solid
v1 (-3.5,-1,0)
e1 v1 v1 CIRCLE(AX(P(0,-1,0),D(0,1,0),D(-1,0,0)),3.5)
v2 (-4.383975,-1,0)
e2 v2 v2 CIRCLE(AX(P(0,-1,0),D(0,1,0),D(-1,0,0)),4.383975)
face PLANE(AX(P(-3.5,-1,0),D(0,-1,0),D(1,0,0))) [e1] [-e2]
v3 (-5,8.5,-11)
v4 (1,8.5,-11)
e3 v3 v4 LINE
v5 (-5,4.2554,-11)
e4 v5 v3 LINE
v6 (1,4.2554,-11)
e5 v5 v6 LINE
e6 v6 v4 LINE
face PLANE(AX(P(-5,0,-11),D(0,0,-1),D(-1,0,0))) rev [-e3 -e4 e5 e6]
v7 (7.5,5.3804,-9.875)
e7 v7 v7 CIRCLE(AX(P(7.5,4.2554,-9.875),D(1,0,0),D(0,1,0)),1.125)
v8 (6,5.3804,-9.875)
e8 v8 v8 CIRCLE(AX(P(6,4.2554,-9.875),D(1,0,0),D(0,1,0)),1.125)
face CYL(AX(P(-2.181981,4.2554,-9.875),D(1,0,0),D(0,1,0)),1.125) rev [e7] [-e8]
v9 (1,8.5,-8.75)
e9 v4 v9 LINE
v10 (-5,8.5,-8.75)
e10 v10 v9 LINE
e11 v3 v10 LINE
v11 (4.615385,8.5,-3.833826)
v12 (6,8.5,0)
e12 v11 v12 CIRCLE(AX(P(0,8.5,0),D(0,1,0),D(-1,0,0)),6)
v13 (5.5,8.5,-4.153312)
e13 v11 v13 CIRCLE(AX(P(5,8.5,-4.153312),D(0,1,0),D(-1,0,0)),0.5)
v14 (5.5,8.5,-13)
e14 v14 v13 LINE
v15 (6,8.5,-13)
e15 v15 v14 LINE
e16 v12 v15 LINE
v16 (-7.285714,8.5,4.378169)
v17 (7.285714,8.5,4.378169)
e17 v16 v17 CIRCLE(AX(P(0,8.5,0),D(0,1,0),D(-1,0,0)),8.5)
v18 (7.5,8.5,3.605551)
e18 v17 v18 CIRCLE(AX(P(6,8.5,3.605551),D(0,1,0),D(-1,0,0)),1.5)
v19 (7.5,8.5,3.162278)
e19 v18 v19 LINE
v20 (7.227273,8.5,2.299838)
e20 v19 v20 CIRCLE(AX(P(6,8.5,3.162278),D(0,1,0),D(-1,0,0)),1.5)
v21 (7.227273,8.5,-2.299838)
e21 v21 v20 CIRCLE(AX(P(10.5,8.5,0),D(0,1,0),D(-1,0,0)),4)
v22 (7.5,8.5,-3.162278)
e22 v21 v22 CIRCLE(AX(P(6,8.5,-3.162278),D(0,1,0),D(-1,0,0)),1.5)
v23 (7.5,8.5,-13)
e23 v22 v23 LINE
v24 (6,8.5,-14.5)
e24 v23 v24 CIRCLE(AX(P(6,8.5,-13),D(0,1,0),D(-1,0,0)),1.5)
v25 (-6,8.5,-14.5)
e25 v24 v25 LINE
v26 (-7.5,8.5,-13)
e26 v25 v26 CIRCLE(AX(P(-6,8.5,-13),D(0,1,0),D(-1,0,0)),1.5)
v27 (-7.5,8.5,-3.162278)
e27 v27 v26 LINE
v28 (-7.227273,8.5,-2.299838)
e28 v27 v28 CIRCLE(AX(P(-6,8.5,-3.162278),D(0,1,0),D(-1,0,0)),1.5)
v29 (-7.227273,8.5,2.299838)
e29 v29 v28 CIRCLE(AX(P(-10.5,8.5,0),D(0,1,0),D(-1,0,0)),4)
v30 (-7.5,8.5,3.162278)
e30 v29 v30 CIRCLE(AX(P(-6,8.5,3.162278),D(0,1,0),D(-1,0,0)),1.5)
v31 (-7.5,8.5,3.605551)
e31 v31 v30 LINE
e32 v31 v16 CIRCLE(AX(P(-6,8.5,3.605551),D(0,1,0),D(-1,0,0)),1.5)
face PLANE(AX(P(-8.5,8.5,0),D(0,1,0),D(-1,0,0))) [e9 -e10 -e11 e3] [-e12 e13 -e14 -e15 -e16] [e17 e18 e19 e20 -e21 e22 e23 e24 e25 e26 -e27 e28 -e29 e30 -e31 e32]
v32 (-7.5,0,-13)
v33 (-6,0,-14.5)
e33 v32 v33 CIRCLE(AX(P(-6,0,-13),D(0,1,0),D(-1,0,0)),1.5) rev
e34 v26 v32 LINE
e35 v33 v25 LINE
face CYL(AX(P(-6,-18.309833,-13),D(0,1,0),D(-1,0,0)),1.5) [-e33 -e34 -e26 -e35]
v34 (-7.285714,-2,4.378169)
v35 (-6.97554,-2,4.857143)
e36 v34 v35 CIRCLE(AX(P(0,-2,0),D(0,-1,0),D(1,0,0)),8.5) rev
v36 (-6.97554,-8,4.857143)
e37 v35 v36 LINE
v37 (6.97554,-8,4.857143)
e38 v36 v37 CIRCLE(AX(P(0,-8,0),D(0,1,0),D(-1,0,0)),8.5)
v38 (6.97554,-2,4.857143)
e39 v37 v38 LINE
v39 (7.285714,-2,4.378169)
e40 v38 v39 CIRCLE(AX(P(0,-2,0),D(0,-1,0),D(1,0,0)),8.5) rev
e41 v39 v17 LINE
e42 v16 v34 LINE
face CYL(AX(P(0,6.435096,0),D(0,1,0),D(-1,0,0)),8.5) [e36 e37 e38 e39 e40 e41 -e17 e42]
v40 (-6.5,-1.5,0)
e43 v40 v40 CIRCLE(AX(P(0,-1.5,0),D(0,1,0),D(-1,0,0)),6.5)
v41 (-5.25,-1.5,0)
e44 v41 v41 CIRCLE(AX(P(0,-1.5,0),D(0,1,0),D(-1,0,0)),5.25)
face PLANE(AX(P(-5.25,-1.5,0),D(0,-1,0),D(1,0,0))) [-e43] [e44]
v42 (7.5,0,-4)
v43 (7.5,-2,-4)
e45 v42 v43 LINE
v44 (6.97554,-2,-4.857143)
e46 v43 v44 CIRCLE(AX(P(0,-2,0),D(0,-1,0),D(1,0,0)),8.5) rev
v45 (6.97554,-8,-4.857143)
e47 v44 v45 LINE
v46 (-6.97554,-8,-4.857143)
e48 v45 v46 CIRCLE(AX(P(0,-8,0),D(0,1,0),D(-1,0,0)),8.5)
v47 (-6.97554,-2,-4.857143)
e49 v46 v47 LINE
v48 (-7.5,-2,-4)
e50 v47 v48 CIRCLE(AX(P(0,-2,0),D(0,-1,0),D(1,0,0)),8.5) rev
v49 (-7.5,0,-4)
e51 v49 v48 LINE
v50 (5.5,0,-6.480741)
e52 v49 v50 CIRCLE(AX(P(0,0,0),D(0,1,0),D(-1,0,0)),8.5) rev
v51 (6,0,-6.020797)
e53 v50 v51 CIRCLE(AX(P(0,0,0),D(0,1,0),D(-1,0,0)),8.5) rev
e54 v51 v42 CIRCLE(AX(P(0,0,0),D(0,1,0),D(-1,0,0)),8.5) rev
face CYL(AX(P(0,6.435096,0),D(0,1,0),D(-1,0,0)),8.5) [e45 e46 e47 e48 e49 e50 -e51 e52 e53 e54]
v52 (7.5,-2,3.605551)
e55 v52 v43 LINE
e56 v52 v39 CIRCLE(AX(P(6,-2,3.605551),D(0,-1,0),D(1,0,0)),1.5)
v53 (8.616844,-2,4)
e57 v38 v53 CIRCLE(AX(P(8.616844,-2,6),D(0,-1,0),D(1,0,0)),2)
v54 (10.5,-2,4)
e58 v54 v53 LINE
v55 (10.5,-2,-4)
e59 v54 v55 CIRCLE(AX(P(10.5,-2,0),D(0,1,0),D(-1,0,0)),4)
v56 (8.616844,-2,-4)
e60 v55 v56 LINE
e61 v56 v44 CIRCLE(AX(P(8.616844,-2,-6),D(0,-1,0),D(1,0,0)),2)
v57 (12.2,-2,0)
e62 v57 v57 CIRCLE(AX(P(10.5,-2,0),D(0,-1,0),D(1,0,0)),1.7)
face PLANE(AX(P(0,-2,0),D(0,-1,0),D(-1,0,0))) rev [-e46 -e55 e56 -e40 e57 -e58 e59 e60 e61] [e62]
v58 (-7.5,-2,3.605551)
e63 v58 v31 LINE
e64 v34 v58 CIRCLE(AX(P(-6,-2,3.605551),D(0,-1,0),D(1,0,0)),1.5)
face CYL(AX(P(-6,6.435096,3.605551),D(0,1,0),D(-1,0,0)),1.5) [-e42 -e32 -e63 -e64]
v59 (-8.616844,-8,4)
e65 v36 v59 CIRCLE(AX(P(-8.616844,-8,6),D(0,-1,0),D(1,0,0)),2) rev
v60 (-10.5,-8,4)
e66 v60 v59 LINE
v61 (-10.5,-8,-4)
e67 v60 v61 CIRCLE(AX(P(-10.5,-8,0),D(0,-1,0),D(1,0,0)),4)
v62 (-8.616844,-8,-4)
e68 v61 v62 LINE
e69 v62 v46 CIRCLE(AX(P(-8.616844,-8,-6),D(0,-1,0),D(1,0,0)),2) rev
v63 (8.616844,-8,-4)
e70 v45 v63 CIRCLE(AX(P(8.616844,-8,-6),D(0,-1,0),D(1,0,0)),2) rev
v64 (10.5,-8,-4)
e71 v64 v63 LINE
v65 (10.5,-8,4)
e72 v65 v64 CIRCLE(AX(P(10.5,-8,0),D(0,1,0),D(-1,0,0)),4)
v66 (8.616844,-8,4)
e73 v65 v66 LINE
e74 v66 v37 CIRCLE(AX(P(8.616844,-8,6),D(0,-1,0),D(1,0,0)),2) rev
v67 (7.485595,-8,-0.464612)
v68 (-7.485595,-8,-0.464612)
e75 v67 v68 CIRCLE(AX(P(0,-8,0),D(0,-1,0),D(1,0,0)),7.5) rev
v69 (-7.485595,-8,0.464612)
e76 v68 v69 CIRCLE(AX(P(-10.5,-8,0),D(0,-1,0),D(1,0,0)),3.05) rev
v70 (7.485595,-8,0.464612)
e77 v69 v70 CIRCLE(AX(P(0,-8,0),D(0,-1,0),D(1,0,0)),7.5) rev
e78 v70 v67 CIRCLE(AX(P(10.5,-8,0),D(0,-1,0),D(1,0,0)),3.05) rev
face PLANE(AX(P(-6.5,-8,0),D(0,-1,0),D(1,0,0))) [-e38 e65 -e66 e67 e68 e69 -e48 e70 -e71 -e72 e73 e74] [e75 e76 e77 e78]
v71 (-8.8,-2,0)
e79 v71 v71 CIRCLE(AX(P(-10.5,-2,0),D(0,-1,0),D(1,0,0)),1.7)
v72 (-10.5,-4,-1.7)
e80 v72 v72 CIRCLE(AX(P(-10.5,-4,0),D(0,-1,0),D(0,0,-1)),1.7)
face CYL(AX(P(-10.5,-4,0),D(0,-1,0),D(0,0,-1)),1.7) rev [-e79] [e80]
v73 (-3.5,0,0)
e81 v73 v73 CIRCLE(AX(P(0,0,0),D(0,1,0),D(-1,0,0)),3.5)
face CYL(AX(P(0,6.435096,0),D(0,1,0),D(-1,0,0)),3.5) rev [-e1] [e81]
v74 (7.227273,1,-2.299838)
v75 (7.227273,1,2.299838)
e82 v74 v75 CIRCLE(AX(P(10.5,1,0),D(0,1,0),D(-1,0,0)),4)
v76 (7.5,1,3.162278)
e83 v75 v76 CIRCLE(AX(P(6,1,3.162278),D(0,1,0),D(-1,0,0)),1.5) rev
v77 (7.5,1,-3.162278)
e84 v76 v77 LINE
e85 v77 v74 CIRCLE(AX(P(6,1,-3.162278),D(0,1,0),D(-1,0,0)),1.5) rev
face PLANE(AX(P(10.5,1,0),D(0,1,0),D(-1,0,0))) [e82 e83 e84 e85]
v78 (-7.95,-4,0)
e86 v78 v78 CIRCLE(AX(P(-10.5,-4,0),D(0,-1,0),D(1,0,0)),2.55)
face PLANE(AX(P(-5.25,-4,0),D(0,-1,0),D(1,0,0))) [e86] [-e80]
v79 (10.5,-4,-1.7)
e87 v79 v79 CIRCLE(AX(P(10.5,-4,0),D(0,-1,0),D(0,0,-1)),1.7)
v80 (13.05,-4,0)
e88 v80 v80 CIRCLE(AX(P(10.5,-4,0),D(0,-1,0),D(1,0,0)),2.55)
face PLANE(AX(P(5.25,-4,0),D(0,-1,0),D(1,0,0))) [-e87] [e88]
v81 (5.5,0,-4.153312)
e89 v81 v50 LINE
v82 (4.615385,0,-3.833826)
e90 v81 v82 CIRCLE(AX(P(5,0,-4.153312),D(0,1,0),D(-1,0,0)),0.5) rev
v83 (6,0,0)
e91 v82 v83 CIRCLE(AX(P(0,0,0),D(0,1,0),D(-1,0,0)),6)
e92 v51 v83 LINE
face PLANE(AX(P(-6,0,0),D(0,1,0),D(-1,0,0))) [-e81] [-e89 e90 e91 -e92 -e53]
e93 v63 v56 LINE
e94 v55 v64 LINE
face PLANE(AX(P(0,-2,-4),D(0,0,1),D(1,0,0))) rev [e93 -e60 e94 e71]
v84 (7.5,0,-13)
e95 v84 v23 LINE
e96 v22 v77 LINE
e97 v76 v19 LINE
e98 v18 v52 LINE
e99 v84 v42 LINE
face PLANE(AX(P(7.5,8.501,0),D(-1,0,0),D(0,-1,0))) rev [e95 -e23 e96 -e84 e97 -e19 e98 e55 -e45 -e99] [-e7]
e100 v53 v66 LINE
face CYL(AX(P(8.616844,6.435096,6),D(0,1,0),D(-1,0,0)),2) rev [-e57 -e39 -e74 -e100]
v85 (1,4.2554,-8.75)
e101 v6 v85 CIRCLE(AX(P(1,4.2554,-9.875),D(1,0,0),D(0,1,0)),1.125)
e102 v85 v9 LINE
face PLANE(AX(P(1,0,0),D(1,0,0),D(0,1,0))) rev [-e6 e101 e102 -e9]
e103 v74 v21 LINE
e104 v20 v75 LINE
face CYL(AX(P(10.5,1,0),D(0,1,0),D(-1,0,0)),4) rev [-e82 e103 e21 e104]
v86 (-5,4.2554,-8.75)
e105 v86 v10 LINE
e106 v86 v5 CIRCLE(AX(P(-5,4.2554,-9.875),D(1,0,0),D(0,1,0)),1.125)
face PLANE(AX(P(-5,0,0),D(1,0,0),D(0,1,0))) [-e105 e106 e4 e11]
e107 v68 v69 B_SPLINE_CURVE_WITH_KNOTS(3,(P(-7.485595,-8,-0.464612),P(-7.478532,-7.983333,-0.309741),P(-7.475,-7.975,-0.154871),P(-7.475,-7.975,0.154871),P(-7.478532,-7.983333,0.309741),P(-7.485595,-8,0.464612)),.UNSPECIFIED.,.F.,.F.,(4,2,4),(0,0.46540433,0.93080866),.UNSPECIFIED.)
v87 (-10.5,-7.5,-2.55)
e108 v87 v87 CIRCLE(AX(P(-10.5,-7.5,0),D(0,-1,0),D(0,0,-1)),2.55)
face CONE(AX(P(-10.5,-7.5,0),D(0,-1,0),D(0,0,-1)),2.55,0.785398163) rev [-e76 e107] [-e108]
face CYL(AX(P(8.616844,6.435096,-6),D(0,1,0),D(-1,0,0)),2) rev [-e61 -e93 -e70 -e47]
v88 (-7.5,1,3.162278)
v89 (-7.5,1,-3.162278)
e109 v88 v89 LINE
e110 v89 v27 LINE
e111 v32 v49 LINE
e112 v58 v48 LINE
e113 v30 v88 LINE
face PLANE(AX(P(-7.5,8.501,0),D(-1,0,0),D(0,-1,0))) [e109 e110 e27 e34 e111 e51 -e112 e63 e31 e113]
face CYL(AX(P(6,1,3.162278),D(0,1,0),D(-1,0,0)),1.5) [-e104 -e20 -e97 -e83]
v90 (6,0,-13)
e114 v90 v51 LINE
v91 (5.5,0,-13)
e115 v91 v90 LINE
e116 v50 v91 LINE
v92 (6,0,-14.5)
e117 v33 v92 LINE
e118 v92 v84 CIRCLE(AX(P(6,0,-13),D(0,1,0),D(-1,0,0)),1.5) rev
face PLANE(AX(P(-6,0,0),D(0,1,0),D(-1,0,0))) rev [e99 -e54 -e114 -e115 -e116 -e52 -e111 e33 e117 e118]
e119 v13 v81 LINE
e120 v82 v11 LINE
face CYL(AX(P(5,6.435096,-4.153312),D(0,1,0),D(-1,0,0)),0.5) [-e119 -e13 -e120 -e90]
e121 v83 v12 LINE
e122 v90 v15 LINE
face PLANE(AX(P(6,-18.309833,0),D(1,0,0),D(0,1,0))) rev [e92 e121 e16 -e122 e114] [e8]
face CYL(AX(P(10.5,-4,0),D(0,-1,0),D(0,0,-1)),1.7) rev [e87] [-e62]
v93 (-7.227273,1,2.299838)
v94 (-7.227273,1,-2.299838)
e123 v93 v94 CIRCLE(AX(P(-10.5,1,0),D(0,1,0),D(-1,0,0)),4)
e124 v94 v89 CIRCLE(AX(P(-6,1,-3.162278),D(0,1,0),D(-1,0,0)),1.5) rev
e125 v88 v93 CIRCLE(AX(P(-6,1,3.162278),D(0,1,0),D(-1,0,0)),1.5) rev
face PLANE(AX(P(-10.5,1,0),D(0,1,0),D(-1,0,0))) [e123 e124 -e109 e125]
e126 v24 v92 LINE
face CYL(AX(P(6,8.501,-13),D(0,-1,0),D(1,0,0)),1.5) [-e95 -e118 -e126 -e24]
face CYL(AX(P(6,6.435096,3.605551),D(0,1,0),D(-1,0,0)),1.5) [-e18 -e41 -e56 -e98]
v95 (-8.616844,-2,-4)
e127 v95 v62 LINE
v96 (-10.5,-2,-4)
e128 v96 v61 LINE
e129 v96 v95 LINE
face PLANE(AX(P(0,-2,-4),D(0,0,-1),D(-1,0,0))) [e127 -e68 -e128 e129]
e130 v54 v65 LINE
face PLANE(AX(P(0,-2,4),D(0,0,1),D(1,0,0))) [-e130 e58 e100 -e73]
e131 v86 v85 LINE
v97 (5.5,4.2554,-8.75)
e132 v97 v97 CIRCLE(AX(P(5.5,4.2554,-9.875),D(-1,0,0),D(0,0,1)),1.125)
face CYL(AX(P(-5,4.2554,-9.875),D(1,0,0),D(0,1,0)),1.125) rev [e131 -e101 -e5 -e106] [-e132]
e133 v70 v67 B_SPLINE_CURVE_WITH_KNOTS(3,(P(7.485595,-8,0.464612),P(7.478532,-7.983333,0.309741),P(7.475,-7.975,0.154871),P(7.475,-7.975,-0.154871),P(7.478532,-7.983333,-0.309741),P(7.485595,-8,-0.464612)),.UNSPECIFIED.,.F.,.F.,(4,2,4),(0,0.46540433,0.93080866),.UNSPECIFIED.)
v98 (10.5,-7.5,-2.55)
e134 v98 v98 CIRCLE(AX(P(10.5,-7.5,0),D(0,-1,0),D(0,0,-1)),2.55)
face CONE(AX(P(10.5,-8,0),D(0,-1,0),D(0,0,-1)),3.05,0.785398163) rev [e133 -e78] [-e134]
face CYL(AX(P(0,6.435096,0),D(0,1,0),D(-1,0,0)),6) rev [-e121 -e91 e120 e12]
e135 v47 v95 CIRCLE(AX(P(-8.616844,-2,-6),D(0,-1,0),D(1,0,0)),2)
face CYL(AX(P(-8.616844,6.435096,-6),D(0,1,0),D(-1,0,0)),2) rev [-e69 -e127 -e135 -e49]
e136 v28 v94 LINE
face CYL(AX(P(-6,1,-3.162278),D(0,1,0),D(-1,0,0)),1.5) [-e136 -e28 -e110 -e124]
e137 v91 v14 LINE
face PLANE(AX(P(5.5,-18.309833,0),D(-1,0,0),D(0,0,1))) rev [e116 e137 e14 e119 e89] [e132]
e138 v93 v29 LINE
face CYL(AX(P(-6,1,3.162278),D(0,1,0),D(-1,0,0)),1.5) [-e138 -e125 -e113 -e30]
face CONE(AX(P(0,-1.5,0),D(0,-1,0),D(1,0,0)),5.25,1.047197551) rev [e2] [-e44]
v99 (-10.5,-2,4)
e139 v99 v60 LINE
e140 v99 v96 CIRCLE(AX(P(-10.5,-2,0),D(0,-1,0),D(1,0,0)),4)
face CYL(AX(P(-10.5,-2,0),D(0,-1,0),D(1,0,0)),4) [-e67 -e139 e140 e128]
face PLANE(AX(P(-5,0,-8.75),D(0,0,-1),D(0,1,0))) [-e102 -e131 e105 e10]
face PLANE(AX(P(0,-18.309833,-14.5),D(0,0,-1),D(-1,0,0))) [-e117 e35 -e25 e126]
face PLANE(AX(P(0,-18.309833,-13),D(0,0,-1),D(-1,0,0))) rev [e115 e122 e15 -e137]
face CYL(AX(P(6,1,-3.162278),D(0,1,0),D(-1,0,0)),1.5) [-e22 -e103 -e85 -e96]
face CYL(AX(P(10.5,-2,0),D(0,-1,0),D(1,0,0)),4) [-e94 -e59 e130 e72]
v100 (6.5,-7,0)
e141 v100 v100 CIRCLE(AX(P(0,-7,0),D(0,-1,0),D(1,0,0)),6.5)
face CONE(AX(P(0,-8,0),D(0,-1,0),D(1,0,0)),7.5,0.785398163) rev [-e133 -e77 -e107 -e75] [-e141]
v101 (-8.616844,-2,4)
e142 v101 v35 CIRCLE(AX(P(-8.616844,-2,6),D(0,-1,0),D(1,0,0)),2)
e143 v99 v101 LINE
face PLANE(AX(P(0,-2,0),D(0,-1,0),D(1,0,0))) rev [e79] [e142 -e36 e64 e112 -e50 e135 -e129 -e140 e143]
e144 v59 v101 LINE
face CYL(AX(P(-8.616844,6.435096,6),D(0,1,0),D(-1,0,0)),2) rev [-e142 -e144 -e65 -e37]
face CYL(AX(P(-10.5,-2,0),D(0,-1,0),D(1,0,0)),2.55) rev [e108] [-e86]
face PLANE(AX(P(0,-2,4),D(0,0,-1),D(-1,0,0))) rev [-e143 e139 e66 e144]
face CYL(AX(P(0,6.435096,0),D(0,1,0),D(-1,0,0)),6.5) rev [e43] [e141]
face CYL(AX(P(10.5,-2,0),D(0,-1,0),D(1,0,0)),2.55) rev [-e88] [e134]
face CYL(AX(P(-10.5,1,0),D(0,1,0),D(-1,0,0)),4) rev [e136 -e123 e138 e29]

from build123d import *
from build123d.topology import SkipClean

# Parameters (mm, degrees)
BOSS_EXTRU_1_START      = -6
BOSS_EXTRU_1_DEPTH      = 6
BOSS_EXTRU_2_START      = -6
BOSS_EXTRU_2_DEPTH      = 2
ENL_V_START             = -4
ENL_V_MAT_EXTRU_1_DEPTH = 4
ENL_V_START_2           = -16.5
ENL_V_MAT_EXTRU_5_DEPTH = 10.5
CONG_1_R                = 2
CHANFREIN1_SIZE         = 0.5
SYM_TRIE1_START         = -2
SYM_TRIE1_DEPTH         = 10.5
SYM_TRIE1_START_2       = -8
SYM_TRIE1_2_DEPTH       = 4
SYM_TRIE1_START_3       = -7.5000001
SYM_TRIE1_3_DEPTH       = 5.5000001
SYM_TRIE1_START_4       = -4
SYM_TRIE1_4_DEPTH       = 2
SYM_TRIE1_7_DEPTH       = 0.4999999
M3_CLEARANCE_HOLE1_D    = 3.4
BOSS_EXTRU_3_DEPTH      = 8.5
ENL_V_START_3           = -8.5
ENL_V_MAT_EXTRU_2_DEPTH = 8.5
ENL_V_START_4           = -6.5
ESQUISSE5_R             = 1.125
ENL_V_MAT_EXTRU_3_DEPTH = 6
ESQUISSE5_3_R           = 1.125
ENL_V_MAT_EXTRU_4_DEPTH = 6.5
CONG_2_R                = 0.5
CONG_3_R                = 1.5
ENL_V_START_5           = -7.5
ESQUISSE9_R             = 4
ENL_V_MAT_EXTRU_8_DEPTH = 7.5
CONG_5_R                = 1.5
CHANFREIN2_SIZE         = 1


with BuildPart() as part:
    # Esquisse1 → Révolution1 (revolve)
    with BuildSketch(Plane.XY):
        Polygon((-8.5, 8.5), (-6, 8.5), (-6, 0), (-3.5, 0), (-3.5, -1), (-4.383974596, -1), (-5.25, -1.5), (-6.5, -1.5), (-6.5, -8), (-8.5, -8), align=None)
    revolve(axis=Axis((0, 6.43509573, 0), (0, -1, 0)))

    # Esquisse3 → Boss.-Extru.1 (add)
    with BuildSketch(Plane.XZ.offset(8).offset(BOSS_EXTRU_1_START)):
        with BuildLine():
            ThreePointArc((-7.928571429, 3.06394437), (-7.728470361, 3.5384666), (-7.5, 4))
            Line((-7.5, 4), (-10.5, 4))
            ThreePointArc((-10.5, 4), (-14.5, 0), (-10.5, -4))
            Line((-10.5, -4), (-7.5, -4))
            ThreePointArc((-7.5, -4), (-7.728470361, -3.5384666), (-7.928571429, -3.06394437))
            ThreePointArc((-7.928571429, -3.06394437), (-8.196108254, -2.252511816), (-8.380833333, -1.418320358))
            ThreePointArc((-8.380833333, -1.418320358), (-13.05, 0), (-8.380833333, 1.418320358))
            ThreePointArc((-8.380833333, 1.418320358), (-8.196108254, 2.252511816), (-7.928571429, 3.06394437))
        make_face()
    extrude(amount=BOSS_EXTRU_1_DEPTH)

    # Esquisse3<4> → Boss.-Extru.2 (add)
    with BuildSketch(Plane.XZ.offset(8).offset(BOSS_EXTRU_2_START)):
        with BuildLine():
            ThreePointArc((-8.380833333, -1.418320358), (-8.5, 0), (-8.380833333, 1.418320358))
            ThreePointArc((-8.380833333, 1.418320358), (-13.05, 0), (-8.380833333, -1.418320358))
        make_face()
    extrude(amount=BOSS_EXTRU_2_DEPTH)

    # Esquisse3<5> → Enlèv. mat.-Extru.1 (cut)
    with SkipClean():  # the faces are left unmerged after this step: merging them gives an invalid solid
        with BuildSketch(Plane.XZ.offset(8).offset(ENL_V_START)):
            with BuildLine():
                ThreePointArc((-7.95, 0), (-8.06008453, 0.741156191), (-8.380833333, 1.418320358))
                ThreePointArc((-8.380833333, 1.418320358), (-8.5, 0), (-8.380833333, -1.418320358))
                ThreePointArc((-8.380833333, -1.418320358), (-8.06008453, -0.741156191), (-7.95, 0))
            make_face()
        extrude(amount=ENL_V_MAT_EXTRU_1_DEPTH, mode=Mode.SUBTRACT)

    # Esquisse3<7> → Enlèv. mat.-Extru.5 (cut)
    with SkipClean():  # the faces are left unmerged after this step: merging them gives an invalid solid
        with BuildSketch(Plane.XZ.offset(8).offset(ENL_V_START_2)):
            with BuildLine():
                ThreePointArc((-7.5, 4), (-8.5, 0), (-7.5, -4))
                Line((-7.5, -4), (-7.5, 4))
            make_face()
        extrude(amount=ENL_V_MAT_EXTRU_5_DEPTH, mode=Mode.SUBTRACT)

    # Congé1
    # the kernel refuses this fillet: 2 mm, written as the material it adds along each edge
    with BuildSketch(Plane(origin=(-7.5, -2, 4), x_dir=(0.5219209843200922, 0, 0.8529938370975175), z_dir=(0, -1, 0))) as cong_1_piece_1:
        with BuildLine():
            CenterArc((1.12308337, 1.996502992), CONG_1_R, 211.461195757, 55.150095421)
            Line((-0.582904304, 0.952661023), (0, 0))
            ThreePointArc((0, 0), (0.502432034, 0.014862284), (1.004864068, 0))
        make_face()
    extrude(amount=6)
    with BuildSketch(Plane(origin=(-7.5, -2, -4), x_dir=(0.521920984320094, 0, -0.8529938370975163), z_dir=(0, -1, 0))) as cong_1_piece_2:
        with BuildLine():
            CenterArc((1.12308337, -1.996502992), CONG_1_R, 93.388708822, 55.150095421)
            Line((-0.582904304, -0.952661023), (0, 0))
            ThreePointArc((0, 0), (0.502432034, -0.014862284), (1.004864068, 0))
        make_face()
    extrude(amount=6)

    # Chanfrein1
    chanfrein1_edges = [part.edges().sort_by_distance(p)[0] for p in [
        (-7.95, -8, 0),
    ]]
    chamfer(chanfrein1_edges, length=CHANFREIN1_SIZE)

    # Symétrie1: read off the stored shape, not the designer's step
    # Symétrie1 outline → Symétrie1 (cut)
    with BuildSketch(Plane(origin=(0, 0, 0), x_dir=(1, 0, 0), z_dir=(0, 1, 0)).offset(SYM_TRIE1_START)):
        with BuildLine():
            Line((7.5, 4), (7.5, -4))
            ThreePointArc((7.5, -4), (8.5, 0), (7.5, 4))
        make_face()
    extrude(amount=SYM_TRIE1_DEPTH, mode=Mode.SUBTRACT)

    # Sym_trie1 2 outline → Sym_trie1 2 (cut)
    with BuildSketch(Plane(origin=(0, 0, 0), x_dir=(1, 0, 0), z_dir=(0, 1, 0)).offset(SYM_TRIE1_START_2)):
        with BuildLine():
            ThreePointArc((8.380833333, 1.418320358), (7.95, 0), (8.380833333, -1.418320358))
            ThreePointArc((8.380833333, -1.418320358), (8.5, 0), (8.380833333, 1.418320358))
        make_face()
    extrude(amount=SYM_TRIE1_2_DEPTH, mode=Mode.SUBTRACT)

    # Sym_trie1 3 outline → Sym_trie1 3 (add)
    with BuildSketch(Plane(origin=(0, 0, 0), x_dir=(1, 0, 0), z_dir=(0, 1, 0)).offset(SYM_TRIE1_START_3)):
        with BuildLine():
            ThreePointArc((6.975540357, -4.857142857), (7.69102387, -4.227189479), (8.61684397, -4))
            Line((8.61684397, -4), (10.5, -4))
            ThreePointArc((10.5, -4), (14.5, 0), (10.5, 4))
            Line((10.5, 4), (8.61684397, 4))
            ThreePointArc((8.61684397, 4), (7.69102387, 4.227189479), (6.975540357, 4.857142857))
            ThreePointArc((6.975540357, 4.857142857), (7.868349781, 3.215442696), (8.380833333, 1.418320358))
            ThreePointArc((8.380833333, 1.418320358), (13.05, 0), (8.380833333, -1.418320358))
            ThreePointArc((8.380833333, -1.418320358), (7.868349781, -3.215442696), (6.975540357, -4.857142857))
        make_face()
    extrude(amount=SYM_TRIE1_3_DEPTH)

    # Sym_trie1 4 outline → Sym_trie1 4 (add)
    with BuildSketch(Plane(origin=(0, 0, 0), x_dir=(1, 0, 0), z_dir=(0, 1, 0)).offset(SYM_TRIE1_START_4)):
        with BuildLine():
            ThreePointArc((8.380833333, 1.418320358), (8.5, 0), (8.380833333, -1.418320358))
            ThreePointArc((8.380833333, -1.418320358), (13.05, 0), (8.380833333, 1.418320358))
        make_face()
    extrude(amount=SYM_TRIE1_4_DEPTH)

    # Sym_trie1 5 outline → Sym_trie1 5 (revolve, cut)
    with BuildSketch(Plane(origin=(10.5, 0, 0), x_dir=(1, 0, 0), z_dir=(0, 0, 1))):
        Polygon((3.05, -8), (2.55, -7.5), (2.55, -8), align=None)
    revolve(axis=Axis((10.5, 0, 0), (0, 1, 0)), mode=Mode.SUBTRACT)

    # Sym_trie1 6 outline → Sym_trie1 6 (revolve)
    with SkipClean():  # the faces are left unmerged after this step: merging them gives an invalid solid
        with BuildSketch(Plane(origin=(10.5, 0, 0), x_dir=(1, 0, 0), z_dir=(0, 0, 1))):
            Polygon((3.05, -7.5), (2.55, -7.5), (3.05, -8), align=None)
        revolve(axis=Axis((10.5, 0, 0), (0, 1, 0)))

    # Sym_trie1 7 outline → Sym_trie1 7 (add)
    with BuildSketch(Plane(origin=(0, 0, 0), x_dir=(1, 0, 0), z_dir=(0, 1, 0)).offset(SYM_TRIE1_START_2)):
        with BuildLine():
            ThreePointArc((8.2475, 2.056390953), (13.55, 0), (8.2475, -2.056390953))
            ThreePointArc((8.2475, -2.056390953), (7.933495012, -3.051173035), (7.5, -4))
            ThreePointArc((7.5, -4), (7.250447615, -4.436328367), (6.975540357, -4.857142857))
            ThreePointArc((6.975540357, -4.857142857), (7.69102387, -4.227189479), (8.61684397, -4))
            Line((8.61684397, -4), (10.5, -4))
            ThreePointArc((10.5, -4), (14.5, 0), (10.5, 4))
            Line((10.5, 4), (8.61684397, 4))
            ThreePointArc((8.61684397, 4), (7.69102387, 4.227189479), (6.975540357, 4.857142857))
            ThreePointArc((6.975540357, 4.857142857), (7.250447615, 4.436328367), (7.5, 4))
            ThreePointArc((7.5, 4), (7.933495012, 3.051173035), (8.2475, 2.056390953))
        make_face()
    extrude(amount=SYM_TRIE1_7_DEPTH)

    # M3 Clearance Hole1 (through all)
    with Locations(Plane(origin=(0, -4, 0), x_dir=(-1, 0, 0), z_dir=(0, -1, 0))):
        with Locations((10.5, 0), (-10.5, 0)):
            Hole(M3_CLEARANCE_HOLE1_D / 2)

    # Esquisse4 → Boss.-Extru.3 (add)
    with BuildSketch(Plane(origin=(0, 8.5, 0), x_dir=(1, 0, 0), z_dir=(0, 1, 0))):
        with BuildLine():
            Line((7.5, 14.5), (-7.5, 14.5))
            Line((-7.5, 14.5), (-7.5, 4))
            ThreePointArc((-7.5, 4), (-1.593272922, 8.349340177), (5.5, 6.480740698))
            Line((5.5, 6.480740698), (5.5, 13))
            Line((5.5, 13), (6, 13))
            Line((6, 13), (6, 6.020797289))
            ThreePointArc((6, 6.020797289), (6.825203691, 5.066220937), (7.5, 4))
            Line((7.5, 4), (7.5, 14.5))
        make_face()
    extrude(amount=-BOSS_EXTRU_3_DEPTH)

    # Esquisse4<3> → Enlèv. mat.-Extru.2 (cut)
    with BuildSketch(Plane(origin=(0, 8.5, 0), x_dir=(1, 0, 0), z_dir=(0, 1, 0)).offset(ENL_V_START_3)):
        with BuildLine():
            Line((6, 0), (6, 13))
            Line((6, 13), (5.5, 13))
            Line((5.5, 13), (5.5, 2.397915762))
            ThreePointArc((5.5, 2.397915762), (5.873670062, 1.224744871), (6, 0))
        make_face()
    extrude(amount=ENL_V_MAT_EXTRU_2_DEPTH, mode=Mode.SUBTRACT)

    # Esquisse5 → Enlèv. mat.-Extru.3 (cut)
    with BuildSketch(Plane(origin=(7.5, 0, 0), x_dir=(0, 0, -1), z_dir=(1, 0, 0)).offset(ENL_V_START_4)):
        with Locations((9.875, 4.2554)):
            Circle(ESQUISSE5_R)
        with BuildLine():
            Line((8.75, 8.5), (8.75, 4.2554))
            ThreePointArc((8.75, 4.2554), (9.875, 5.3804), (11, 4.2554))
            Line((11, 4.2554), (11, 8.5))
            Line((11, 8.5), (8.75, 8.5))
        make_face()
    extrude(amount=-ENL_V_MAT_EXTRU_3_DEPTH, mode=Mode.SUBTRACT)

    # Esquisse5<3> → Enlèv. mat.-Extru.4 (cut)
    with BuildSketch(Plane(origin=(7.5, 0, 0), x_dir=(0, 0, -1), z_dir=(1, 0, 0))):
        with Locations(Location((9.875, 4.2554, 0), (0, 0, 180))):
            Circle(ESQUISSE5_3_R)
    extrude(amount=-ENL_V_MAT_EXTRU_4_DEPTH, mode=Mode.SUBTRACT)

    # Congé2
    # the kernel refuses this fillet: 0.5 mm, written as the material it takes off along each edge
    with BuildSketch(Plane(origin=(5.5, 0, -2.397915762), x_dir=(0, 0, -1), z_dir=(0, 1, 0))) as cong_2_piece_1:
        with BuildLine():
            CenterArc((1.75539617, 0.5), CONG_2_R, 129.715137232, 140.284862768)
            ThreePointArc((1.435910637, 0.884615385), (0.749192225, 0.391603841), (0, 0))
            Line((0, 0), (1.75539617, 0))
        make_face()
    extrude(amount=12.888490425, mode=Mode.SUBTRACT)

    # Congé3
    cong_3_edges = [part.edges().sort_by_distance(p)[0] for p in [
        (7.5, 3.25, 4),
        (7.5, 4.25, -14.5),
        (-7.5, 4.25, -14.5),
        (-7.5, 3.25, 4),
    ]]
    fillet(cong_3_edges, radius=CONG_3_R)

    # Esquisse9 → Enlèv. mat.-Extru.8 (cut)
    with BuildSketch(Plane(origin=(0, 8.5, 0), x_dir=(1, 0, 0), z_dir=(0, 1, 0)).offset(ENL_V_START_5)):
        with Locations((-10.5, 0)):
            Circle(ESQUISSE9_R)
        with Locations((10.5, 0)):
            Circle(ESQUISSE9_R)
    extrude(amount=ENL_V_MAT_EXTRU_8_DEPTH, mode=Mode.SUBTRACT)

    # Congé5
    cong_5_edges = [part.edges().sort_by_distance(p)[0] for p in [
        (7.5, 4.75, -2.645751311),
        (7.5, 4.75, 2.645751311),
        (-7.5, 4.75, -2.645751311),
        (-7.5, 4.75, 2.645751311),
    ]]
    fillet(cong_5_edges, radius=CONG_5_R)

    # Chanfrein2
    # the kernel refuses this chamfer: 1 mm, written as the material it takes off along each edge
    with BuildSketch(Plane(origin=(0, -8, 0), x_dir=(-1, 0, 0), z_dir=(0, 0, 1))) as chanfrein2_piece_1:
        Polygon((6.5 + CHANFREIN2_SIZE, 0), (6.5, -CHANFREIN2_SIZE), (6.5, 0), align=None)
    revolve(axis=Axis((0, -8, 0), (0, -1, 0)), mode=Mode.SUBTRACT)


solid = part.part
